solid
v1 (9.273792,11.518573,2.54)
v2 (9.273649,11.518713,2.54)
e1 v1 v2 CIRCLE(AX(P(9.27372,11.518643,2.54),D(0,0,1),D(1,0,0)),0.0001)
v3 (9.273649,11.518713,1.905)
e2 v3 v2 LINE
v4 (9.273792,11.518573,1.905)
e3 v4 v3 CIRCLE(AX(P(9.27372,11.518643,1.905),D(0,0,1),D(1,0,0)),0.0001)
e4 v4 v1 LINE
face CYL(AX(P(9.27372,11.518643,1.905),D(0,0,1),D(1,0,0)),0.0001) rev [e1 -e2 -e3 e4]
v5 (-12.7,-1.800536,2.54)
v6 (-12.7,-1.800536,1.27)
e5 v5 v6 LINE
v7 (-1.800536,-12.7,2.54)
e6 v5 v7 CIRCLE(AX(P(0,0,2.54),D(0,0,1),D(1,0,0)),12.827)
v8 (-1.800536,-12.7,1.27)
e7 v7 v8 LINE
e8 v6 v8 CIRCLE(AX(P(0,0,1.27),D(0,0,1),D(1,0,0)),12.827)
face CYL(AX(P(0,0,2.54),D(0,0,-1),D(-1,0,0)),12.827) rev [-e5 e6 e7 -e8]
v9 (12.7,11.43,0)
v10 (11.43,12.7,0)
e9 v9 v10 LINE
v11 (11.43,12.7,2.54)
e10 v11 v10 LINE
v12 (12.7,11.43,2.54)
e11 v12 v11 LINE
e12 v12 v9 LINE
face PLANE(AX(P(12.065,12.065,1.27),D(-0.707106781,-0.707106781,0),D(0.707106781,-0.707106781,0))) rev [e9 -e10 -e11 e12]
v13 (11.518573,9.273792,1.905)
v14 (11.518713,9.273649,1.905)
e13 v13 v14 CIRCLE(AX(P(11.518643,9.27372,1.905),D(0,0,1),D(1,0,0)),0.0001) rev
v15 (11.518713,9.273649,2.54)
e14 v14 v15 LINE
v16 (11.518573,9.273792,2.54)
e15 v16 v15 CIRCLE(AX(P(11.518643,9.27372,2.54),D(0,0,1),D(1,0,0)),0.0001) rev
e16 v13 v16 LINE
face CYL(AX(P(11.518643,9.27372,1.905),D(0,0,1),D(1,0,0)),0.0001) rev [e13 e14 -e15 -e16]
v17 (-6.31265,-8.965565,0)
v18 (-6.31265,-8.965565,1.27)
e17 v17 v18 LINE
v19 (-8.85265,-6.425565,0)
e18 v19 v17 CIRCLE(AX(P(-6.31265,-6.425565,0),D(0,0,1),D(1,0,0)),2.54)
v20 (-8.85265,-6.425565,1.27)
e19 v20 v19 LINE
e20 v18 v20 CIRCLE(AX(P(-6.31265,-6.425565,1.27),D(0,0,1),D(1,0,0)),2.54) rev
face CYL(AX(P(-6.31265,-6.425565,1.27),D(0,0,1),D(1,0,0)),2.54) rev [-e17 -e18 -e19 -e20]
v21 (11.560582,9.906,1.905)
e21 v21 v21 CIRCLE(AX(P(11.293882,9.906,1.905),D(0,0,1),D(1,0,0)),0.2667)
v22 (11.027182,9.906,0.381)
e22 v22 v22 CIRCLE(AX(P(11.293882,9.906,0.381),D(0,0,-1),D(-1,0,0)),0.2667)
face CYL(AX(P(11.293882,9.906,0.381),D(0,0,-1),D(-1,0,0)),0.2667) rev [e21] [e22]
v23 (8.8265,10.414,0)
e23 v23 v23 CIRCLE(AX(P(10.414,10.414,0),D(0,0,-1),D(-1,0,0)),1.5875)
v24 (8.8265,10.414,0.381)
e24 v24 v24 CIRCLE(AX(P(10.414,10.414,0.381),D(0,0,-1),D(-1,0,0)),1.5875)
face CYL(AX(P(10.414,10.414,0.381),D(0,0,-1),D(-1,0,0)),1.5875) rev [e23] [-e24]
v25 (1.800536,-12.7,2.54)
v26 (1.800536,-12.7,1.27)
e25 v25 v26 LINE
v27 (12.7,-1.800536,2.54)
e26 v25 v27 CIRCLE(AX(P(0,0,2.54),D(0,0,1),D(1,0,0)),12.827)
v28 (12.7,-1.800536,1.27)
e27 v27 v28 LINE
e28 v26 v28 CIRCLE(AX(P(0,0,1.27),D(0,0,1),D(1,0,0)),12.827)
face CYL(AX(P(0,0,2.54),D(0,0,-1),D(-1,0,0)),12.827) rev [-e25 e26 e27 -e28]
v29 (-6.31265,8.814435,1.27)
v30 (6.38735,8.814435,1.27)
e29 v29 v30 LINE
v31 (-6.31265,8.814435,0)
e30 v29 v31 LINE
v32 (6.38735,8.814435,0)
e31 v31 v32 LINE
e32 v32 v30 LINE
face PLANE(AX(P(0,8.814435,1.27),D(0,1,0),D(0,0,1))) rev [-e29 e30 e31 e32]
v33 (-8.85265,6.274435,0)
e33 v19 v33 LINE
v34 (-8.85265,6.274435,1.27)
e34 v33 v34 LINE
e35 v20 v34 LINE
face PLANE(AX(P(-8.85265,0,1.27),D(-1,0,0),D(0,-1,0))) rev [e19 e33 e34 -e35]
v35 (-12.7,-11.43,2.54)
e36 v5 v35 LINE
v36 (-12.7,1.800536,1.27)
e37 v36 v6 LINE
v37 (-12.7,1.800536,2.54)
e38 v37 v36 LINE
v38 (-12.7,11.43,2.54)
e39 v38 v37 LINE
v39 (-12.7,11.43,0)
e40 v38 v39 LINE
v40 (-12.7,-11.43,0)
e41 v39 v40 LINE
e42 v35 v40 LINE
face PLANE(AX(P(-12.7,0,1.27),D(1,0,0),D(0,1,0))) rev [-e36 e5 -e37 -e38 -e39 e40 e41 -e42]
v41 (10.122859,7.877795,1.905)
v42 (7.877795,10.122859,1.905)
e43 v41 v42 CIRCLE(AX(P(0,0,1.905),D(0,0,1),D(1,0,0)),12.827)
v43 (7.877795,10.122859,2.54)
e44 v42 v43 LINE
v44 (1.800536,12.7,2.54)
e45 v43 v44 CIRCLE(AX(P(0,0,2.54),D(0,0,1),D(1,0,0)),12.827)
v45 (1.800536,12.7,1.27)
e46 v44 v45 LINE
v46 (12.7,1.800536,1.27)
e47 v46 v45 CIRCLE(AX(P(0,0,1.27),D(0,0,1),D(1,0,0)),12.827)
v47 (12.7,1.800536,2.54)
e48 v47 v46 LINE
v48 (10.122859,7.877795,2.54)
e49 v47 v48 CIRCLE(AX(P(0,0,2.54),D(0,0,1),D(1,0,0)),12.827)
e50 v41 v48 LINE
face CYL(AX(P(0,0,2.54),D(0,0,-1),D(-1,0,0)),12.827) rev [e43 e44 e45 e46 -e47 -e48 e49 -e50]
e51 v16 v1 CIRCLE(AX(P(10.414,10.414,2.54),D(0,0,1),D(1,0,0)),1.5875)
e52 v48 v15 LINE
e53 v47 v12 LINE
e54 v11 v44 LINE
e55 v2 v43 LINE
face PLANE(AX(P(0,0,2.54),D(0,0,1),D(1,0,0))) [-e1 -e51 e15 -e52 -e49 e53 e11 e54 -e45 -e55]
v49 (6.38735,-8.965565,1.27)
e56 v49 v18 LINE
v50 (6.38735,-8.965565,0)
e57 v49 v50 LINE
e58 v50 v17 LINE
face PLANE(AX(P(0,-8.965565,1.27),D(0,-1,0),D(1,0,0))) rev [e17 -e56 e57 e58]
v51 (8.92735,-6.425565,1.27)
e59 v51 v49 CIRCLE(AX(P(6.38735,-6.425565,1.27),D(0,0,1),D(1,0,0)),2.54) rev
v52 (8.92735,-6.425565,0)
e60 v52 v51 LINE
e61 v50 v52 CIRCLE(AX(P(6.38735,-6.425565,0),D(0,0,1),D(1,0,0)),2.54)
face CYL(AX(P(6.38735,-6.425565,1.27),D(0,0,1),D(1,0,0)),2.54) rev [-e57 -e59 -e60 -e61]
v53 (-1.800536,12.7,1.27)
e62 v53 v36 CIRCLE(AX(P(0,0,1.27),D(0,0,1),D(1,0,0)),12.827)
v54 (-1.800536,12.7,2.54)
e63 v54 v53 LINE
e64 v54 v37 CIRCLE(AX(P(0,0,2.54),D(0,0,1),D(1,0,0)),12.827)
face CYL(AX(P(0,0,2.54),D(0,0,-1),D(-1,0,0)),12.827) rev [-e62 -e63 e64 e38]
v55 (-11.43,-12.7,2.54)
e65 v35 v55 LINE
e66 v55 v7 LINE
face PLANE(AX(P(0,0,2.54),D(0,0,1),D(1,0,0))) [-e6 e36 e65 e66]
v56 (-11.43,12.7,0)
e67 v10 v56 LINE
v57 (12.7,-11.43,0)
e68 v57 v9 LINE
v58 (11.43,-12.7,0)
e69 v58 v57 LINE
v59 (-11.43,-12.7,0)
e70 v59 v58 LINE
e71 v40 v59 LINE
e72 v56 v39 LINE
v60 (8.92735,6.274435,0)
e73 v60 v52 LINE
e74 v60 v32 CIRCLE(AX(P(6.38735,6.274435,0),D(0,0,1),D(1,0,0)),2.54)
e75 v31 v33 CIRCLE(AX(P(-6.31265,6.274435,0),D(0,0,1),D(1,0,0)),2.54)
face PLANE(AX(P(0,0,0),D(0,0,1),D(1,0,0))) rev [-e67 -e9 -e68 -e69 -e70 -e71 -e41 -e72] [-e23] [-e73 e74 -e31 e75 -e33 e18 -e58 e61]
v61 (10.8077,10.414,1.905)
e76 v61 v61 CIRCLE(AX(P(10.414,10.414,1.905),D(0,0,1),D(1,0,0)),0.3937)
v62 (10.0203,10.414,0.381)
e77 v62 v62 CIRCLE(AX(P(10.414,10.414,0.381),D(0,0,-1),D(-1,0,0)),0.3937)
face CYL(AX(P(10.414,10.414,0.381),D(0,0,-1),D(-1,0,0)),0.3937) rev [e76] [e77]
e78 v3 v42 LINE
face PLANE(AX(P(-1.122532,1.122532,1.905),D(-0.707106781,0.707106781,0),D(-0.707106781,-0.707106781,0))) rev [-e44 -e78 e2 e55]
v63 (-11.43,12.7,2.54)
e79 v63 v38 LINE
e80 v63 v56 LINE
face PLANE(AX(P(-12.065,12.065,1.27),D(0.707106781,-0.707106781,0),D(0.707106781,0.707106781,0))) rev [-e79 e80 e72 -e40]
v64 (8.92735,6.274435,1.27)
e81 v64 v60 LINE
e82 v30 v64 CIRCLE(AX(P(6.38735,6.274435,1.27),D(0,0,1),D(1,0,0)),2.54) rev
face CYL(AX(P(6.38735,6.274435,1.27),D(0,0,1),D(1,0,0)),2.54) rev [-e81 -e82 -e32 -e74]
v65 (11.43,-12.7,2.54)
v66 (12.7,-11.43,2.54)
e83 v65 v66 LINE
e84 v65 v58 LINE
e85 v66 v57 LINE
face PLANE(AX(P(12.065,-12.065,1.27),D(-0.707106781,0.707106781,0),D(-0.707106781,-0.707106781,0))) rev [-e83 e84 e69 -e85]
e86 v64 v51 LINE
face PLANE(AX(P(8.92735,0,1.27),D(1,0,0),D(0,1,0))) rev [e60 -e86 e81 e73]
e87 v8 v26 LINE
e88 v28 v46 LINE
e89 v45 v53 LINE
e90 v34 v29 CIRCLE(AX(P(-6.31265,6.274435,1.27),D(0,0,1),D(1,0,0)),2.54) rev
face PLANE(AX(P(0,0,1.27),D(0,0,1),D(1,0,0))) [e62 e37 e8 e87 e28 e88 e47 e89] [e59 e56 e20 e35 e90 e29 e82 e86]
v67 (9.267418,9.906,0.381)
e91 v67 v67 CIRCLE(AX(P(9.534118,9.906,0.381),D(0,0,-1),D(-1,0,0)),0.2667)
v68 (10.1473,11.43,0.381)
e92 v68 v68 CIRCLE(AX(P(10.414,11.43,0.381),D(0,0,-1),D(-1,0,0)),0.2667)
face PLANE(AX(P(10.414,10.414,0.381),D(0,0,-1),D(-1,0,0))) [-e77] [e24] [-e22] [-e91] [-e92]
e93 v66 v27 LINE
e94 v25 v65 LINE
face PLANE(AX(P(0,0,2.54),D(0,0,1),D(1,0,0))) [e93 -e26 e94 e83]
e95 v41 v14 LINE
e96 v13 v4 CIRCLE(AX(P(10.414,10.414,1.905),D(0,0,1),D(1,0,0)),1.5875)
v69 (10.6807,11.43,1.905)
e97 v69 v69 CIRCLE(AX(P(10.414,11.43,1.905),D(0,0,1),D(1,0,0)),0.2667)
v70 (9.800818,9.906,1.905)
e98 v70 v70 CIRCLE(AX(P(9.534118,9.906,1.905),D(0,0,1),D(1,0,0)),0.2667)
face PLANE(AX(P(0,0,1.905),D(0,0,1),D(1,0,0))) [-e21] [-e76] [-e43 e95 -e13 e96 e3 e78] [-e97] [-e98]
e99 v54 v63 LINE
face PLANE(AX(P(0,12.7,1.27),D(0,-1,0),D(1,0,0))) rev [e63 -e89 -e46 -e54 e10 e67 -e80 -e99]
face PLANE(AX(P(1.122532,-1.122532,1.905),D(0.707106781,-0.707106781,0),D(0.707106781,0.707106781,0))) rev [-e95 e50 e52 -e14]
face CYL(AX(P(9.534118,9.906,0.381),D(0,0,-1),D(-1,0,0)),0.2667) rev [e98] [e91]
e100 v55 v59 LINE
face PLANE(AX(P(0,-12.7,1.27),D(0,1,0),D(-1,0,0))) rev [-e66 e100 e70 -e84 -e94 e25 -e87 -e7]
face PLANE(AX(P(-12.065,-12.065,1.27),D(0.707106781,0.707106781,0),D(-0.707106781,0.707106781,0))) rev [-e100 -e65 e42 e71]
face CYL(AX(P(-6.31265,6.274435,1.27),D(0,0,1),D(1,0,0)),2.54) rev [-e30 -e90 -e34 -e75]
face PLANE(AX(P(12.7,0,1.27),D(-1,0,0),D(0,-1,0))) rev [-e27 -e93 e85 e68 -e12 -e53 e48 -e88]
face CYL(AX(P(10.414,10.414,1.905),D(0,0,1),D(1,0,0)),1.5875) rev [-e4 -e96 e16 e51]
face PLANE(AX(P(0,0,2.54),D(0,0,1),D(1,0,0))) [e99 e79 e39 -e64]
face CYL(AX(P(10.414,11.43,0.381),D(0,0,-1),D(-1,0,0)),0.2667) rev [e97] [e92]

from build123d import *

# Parameters (mm, degrees)
SKETCH1_W              = 17.78
SKETCH1_H              = 17.78
EXTRUSION1_DEPTH       = 1.27
EXTRUSION2_DEPTH       = 1.27
SKETCH3_R              = 1.5875
EXTRUSION3_DEPTH       = 0.381
HOLE1_D                = 0.5334
HOLE2_D                = 0.7874
EXTRUSION4_START       = -0.635
EXTRUSION4_OUTLINE_R   = 0.2667
EXTRUSION4_OUTLINE_R_2 = 0.3937
EXTRUSION4_DEPTH       = 0.635
FILLET1_R              = 2.54


# Read off the part's stored shape, not the designer's step: Extrusion4
with BuildPart() as part:
    # Sketch1 → Extrusion1 (new body)
    with BuildSketch(Plane.XY):
        Polygon((12.7, 11.43), (11.43, 12.7), (-11.43, 12.7), (-12.7, 11.43), (-12.7, -11.43), (-11.43, -12.7), (11.43, -12.7), (12.7, -11.43), align=None)
        with Locations((0.037350374, -0.075564582)):
            Rectangle(SKETCH1_W, SKETCH1_H, mode=Mode.SUBTRACT)
    extrude(amount=EXTRUSION1_DEPTH)

    # Sketch2 → Extrusion2 (add)
    with BuildSketch(Plane.XY.offset(1.27)):
        with BuildLine():
            ThreePointArc((1.800535754, -12.7), (9.070058682, -9.070058682), (12.7, -1.800535754))
            Line((12.7, -1.800535754), (12.7, -11.43))
            Line((12.7, -11.43), (11.43, -12.7))
            Line((11.43, -12.7), (1.800535754, -12.7))
        make_face()
        with BuildLine():
            ThreePointArc((-12.7, -1.800535754), (-9.070058682, -9.070058682), (-1.800535754, -12.7))
            Line((-1.800535754, -12.7), (-11.43, -12.7))
            Line((-11.43, -12.7), (-12.7, -11.43))
            Line((-12.7, -11.43), (-12.7, -1.800535754))
        make_face()
        with BuildLine():
            ThreePointArc((-1.800535754, 12.7), (-9.070058682, 9.070058682), (-12.7, 1.800535754))
            Line((-12.7, 1.800535754), (-12.7, 11.43))
            Line((-12.7, 11.43), (-11.43, 12.7))
            Line((-11.43, 12.7), (-1.800535754, 12.7))
        make_face()
        with BuildLine():
            ThreePointArc((12.7, 1.800535754), (9.070058682, 9.070058682), (1.800535754, 12.7))
            Line((1.800535754, 12.7), (11.43, 12.7))
            Line((11.43, 12.7), (12.7, 11.43))
            Line((12.7, 11.43), (12.7, 1.800535754))
        make_face()
    extrude(amount=EXTRUSION2_DEPTH)

    # Sketch3 → Extrusion3 (cut)
    with BuildSketch(Plane(origin=(0, 0, 0), x_dir=(-1, 0, 0), z_dir=(0, 0, -1))):
        with Locations((-10.414, 10.414)):
            Circle(SKETCH3_R)
    extrude(amount=-EXTRUSION3_DEPTH, mode=Mode.SUBTRACT)

    # Hole1 (through all)
    with Locations(Plane(origin=(0, 0, 0.381), x_dir=(-1, 0, 0), z_dir=(0, 0, -1))):
        with Locations((-10.414, 11.43), (-11.29388181, 9.906), (-9.53411819, 9.906)):
            Hole(HOLE1_D / 2)

    # Hole2 (through all)
    with Locations(Plane(origin=(0, 0, 0.381), x_dir=(-1, 0, 0), z_dir=(0, 0, -1))):
        with Locations((-10.414, 10.414)):
            Hole(HOLE2_D / 2)

    # Extrusion4 outline → Extrusion4 (cut)
    with BuildSketch(Plane.XY.offset(2.54).offset(EXTRUSION4_START)):
        with BuildLine():
            ThreePointArc((11.518713485, 9.273649455), (11.536532015, 11.536532015), (9.27379199, 11.518573195))
            Line((9.27379199, 11.518573195), (7.877795, 10.12285903))
            ThreePointArc((7.877795, 10.12285903), (9.070058682, 9.070058682), (10.12285903, 7.877795))
            Line((10.12285903, 7.877795), (11.518713485, 9.273649455))
        make_face()
        with Locations((9.53411819, 9.906)):
            Circle(EXTRUSION4_OUTLINE_R, mode=Mode.SUBTRACT)
        with Locations((11.29388181, 9.906)):
            Circle(EXTRUSION4_OUTLINE_R, mode=Mode.SUBTRACT)
        with Locations((10.414, 10.414)):
            Circle(EXTRUSION4_OUTLINE_R_2, mode=Mode.SUBTRACT)
        with Locations((10.414, 11.43)):
            Circle(EXTRUSION4_OUTLINE_R, mode=Mode.SUBTRACT)
    extrude(amount=EXTRUSION4_DEPTH, mode=Mode.SUBTRACT)

    # Fillet1
    fillet1_edges = [part.edges().sort_by_distance(p)[0] for p in [
        (8.927350374, -8.965564582, 0.635),
        (8.927350374, 8.814435418, 0.635),
        (-8.852649626, 8.814435418, 0.635),
        (-8.852649626, -8.965564582, 0.635),
    ]]
    fillet(fillet1_edges, radius=FILLET1_R)


solid = part.part
